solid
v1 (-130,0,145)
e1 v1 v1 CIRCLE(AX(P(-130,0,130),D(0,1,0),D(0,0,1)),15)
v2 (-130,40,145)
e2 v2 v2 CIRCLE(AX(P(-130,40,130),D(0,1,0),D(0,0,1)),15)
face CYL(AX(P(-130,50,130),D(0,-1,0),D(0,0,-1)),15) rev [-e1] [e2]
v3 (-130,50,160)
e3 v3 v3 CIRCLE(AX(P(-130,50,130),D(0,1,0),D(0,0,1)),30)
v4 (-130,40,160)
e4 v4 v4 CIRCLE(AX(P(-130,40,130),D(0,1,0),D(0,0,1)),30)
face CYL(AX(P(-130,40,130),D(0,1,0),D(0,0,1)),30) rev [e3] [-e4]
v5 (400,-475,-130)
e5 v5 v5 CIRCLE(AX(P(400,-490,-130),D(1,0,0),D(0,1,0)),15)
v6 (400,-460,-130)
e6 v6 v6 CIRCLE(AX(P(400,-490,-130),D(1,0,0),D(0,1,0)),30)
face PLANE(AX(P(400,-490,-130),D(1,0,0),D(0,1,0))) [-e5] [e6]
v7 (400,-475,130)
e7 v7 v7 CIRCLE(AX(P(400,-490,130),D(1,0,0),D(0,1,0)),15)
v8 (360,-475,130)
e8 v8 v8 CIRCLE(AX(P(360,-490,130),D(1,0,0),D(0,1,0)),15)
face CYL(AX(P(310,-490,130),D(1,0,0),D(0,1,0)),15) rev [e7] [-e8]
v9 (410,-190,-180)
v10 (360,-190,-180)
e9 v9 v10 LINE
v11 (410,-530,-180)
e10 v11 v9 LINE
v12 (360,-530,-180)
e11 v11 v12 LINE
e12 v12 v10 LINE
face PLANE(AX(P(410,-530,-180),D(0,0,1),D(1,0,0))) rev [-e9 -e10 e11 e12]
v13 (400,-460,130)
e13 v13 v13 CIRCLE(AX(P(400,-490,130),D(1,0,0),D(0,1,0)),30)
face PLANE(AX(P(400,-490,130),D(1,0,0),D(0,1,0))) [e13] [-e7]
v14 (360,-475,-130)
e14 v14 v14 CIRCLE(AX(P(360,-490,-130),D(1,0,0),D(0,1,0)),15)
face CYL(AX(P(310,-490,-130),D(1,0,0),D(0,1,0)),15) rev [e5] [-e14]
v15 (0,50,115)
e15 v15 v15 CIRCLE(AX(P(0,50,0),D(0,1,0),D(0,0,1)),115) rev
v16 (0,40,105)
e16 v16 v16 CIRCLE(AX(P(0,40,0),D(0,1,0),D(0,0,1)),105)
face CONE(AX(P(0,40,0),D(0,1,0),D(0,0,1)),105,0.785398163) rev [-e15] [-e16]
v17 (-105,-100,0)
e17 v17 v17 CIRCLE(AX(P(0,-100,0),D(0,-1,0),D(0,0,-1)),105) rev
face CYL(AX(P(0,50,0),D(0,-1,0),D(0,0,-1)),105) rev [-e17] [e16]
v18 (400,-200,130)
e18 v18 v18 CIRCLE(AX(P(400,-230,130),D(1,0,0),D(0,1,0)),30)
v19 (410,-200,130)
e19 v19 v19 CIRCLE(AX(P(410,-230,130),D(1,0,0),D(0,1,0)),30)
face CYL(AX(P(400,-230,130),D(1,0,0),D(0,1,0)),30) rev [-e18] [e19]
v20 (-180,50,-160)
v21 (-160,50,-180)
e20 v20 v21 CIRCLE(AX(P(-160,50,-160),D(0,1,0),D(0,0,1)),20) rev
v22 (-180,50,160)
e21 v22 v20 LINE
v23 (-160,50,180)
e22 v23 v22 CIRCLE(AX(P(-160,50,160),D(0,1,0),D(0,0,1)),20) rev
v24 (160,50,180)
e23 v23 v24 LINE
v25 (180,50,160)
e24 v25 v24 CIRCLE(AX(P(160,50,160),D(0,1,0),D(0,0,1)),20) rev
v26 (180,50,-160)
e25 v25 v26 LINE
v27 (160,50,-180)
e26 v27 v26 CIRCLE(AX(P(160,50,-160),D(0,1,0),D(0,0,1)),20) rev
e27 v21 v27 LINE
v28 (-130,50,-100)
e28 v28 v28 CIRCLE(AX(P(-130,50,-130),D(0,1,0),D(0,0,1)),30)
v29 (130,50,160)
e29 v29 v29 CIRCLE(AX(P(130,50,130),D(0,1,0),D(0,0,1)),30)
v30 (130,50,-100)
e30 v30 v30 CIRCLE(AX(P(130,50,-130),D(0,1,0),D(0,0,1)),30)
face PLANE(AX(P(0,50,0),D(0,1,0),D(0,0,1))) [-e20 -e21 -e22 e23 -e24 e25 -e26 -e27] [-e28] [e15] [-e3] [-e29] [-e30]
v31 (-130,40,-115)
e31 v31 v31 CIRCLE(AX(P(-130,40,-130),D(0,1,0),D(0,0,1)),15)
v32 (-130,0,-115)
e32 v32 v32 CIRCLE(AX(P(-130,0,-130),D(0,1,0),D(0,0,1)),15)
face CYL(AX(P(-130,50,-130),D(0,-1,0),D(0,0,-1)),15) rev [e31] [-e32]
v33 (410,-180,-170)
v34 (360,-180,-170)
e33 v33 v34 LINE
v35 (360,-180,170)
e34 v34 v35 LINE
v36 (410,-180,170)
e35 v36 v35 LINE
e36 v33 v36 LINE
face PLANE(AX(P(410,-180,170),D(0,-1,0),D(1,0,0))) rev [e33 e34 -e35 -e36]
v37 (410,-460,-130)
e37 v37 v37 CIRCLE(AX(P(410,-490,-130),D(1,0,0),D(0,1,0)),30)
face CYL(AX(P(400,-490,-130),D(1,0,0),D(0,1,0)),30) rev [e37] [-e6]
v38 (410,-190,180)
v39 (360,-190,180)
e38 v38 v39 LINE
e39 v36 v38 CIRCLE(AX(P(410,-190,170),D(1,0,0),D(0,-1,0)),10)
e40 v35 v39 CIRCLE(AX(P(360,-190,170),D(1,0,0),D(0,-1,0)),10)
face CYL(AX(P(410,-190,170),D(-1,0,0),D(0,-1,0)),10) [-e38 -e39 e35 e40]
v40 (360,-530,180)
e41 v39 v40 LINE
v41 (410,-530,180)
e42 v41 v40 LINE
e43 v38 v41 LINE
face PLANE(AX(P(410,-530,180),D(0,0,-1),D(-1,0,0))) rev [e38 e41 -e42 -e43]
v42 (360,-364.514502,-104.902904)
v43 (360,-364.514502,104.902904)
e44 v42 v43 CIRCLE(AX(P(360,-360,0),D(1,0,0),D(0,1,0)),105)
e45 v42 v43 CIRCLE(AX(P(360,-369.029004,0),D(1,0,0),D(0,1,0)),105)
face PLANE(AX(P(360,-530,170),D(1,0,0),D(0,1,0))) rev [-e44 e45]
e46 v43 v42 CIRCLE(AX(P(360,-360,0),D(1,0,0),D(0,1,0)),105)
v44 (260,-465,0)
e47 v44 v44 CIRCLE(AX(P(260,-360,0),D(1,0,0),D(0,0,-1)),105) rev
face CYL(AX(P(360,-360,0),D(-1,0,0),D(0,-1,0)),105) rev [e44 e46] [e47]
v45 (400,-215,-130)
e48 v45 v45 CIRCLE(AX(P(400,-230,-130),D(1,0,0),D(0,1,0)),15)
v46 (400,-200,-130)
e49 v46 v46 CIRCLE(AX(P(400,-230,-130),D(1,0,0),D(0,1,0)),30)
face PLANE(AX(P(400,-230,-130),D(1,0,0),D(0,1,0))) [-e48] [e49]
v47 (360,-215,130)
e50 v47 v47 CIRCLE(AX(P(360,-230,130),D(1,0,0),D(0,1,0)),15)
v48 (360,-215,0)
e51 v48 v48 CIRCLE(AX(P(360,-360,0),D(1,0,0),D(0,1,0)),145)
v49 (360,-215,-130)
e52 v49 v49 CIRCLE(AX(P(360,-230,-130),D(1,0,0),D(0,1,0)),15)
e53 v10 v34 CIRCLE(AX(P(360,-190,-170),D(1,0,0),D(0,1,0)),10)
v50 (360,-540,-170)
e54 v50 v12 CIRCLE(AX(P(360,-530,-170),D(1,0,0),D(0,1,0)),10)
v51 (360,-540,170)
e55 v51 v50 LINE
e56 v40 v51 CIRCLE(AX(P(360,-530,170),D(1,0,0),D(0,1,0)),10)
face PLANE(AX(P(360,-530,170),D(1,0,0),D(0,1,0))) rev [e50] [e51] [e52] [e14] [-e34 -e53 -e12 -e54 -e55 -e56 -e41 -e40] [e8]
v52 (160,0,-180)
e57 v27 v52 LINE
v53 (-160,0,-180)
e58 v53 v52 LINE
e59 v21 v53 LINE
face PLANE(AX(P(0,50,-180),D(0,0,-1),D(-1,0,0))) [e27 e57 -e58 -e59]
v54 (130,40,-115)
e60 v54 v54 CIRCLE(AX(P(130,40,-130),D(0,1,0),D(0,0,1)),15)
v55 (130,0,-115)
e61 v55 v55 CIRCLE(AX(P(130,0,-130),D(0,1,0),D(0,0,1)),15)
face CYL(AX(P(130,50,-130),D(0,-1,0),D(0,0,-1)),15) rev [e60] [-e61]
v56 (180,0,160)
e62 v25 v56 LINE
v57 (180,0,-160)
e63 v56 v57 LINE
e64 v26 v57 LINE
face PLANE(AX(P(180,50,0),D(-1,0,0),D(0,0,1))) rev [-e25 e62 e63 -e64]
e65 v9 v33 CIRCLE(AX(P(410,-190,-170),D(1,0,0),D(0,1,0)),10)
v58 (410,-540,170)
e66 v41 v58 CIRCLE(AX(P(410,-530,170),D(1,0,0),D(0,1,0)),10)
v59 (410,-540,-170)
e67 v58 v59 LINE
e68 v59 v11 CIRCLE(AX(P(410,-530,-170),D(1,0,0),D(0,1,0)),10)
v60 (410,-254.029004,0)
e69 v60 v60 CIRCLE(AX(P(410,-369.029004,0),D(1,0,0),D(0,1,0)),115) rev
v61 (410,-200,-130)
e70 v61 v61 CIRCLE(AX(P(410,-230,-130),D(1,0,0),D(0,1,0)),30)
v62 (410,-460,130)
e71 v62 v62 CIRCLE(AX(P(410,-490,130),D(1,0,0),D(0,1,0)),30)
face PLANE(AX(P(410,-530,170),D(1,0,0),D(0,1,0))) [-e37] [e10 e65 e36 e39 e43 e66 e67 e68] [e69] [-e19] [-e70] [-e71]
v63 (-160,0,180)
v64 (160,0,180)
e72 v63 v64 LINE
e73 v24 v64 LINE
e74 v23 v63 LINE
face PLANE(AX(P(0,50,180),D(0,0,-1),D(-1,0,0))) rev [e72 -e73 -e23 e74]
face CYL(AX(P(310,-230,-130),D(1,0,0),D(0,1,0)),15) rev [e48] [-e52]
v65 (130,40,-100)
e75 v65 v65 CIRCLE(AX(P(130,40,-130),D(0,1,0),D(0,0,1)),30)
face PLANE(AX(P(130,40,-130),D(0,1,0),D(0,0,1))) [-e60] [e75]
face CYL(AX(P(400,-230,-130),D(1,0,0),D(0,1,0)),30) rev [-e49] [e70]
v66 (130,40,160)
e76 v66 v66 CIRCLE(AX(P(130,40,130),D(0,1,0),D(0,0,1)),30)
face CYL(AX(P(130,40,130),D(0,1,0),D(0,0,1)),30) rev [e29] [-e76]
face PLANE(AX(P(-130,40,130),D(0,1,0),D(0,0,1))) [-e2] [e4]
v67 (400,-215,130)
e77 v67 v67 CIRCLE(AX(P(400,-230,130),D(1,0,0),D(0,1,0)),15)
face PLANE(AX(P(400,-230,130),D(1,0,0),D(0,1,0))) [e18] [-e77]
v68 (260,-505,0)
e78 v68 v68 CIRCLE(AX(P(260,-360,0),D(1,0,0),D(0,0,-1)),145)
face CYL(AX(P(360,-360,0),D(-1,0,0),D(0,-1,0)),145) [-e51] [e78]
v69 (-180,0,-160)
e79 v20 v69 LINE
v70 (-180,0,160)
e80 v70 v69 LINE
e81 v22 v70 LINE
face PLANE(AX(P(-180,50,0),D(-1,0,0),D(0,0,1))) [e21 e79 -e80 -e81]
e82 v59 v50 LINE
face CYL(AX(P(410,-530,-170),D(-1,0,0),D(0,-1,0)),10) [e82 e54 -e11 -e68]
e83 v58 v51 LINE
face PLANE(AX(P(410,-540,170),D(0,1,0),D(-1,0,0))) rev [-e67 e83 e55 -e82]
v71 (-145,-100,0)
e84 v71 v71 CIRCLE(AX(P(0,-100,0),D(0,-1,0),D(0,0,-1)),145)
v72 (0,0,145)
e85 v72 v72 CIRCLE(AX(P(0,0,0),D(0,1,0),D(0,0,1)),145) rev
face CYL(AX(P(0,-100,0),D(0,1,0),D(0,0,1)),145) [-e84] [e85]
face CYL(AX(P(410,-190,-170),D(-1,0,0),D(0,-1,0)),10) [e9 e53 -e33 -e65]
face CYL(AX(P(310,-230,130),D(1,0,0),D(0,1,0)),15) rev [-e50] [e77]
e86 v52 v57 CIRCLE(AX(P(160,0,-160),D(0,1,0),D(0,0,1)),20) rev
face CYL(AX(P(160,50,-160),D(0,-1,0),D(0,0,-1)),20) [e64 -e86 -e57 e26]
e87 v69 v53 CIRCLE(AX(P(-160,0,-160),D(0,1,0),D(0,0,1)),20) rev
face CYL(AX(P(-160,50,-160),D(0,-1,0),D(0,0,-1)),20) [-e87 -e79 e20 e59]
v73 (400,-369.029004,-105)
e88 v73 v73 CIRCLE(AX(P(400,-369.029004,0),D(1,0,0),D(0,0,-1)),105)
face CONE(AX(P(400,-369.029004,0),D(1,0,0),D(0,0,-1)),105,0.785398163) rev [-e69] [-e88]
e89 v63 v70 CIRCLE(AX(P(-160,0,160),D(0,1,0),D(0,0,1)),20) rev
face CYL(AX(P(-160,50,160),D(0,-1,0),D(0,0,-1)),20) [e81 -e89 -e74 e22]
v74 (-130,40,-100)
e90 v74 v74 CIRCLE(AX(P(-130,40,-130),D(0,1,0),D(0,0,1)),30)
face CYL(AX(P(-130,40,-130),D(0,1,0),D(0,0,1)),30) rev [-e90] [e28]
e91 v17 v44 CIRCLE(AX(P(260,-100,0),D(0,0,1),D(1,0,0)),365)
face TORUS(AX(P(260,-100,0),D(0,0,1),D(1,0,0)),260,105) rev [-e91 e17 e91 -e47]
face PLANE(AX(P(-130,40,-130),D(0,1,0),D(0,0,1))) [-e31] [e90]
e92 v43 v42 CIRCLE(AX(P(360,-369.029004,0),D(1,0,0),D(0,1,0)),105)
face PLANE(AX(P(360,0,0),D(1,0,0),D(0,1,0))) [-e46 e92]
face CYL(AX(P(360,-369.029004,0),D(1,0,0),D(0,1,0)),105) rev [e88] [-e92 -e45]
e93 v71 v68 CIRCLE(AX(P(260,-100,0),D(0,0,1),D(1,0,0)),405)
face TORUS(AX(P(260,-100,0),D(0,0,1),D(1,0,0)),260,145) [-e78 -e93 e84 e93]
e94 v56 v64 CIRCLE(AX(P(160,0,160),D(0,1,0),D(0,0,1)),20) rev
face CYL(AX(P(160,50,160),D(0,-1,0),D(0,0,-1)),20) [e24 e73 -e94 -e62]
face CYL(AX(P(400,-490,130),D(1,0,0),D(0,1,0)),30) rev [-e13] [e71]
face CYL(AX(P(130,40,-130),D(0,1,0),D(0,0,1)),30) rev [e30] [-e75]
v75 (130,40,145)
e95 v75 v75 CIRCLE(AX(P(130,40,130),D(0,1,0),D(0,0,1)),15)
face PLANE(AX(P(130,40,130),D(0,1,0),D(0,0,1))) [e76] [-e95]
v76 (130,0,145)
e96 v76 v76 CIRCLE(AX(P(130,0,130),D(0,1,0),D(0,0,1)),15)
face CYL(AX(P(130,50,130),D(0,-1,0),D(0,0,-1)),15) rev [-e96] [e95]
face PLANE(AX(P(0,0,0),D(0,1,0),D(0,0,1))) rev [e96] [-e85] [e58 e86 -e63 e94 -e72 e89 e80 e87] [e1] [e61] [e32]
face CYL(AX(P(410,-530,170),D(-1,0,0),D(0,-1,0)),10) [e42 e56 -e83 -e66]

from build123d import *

# Parameters (mm, degrees)
SKETCH2_R           = 30
SKETCH2_R_2         = 105
SKETCH2_R_3         = 28.090856429
SKETCH2_R_4         = 15
BOSS_EXTRUDE2_DEPTH = 50
SKETCH5_R           = 30
CUT_EXTRUDE1_DEPTH  = 10
CHAMFER2_SIZE       = 10
BOSS_EXTRUDE3_START = 100
SKETCH6_R           = 145
SKETCH6_R_2         = 105
BOSS_EXTRUDE3_DEPTH = 100
CUT_EXTRUDE2_START  = -10
SKETCH9_R           = 30
SKETCH9_R_2         = 15
CUT_EXTRUDE2_DEPTH  = 10
SWEEP3_OUTLINE_R    = 145
SWEEP3_OUTLINE_R_2  = 105
SWEEP3_ANGLE        = 90
SKETCH12_R          = 145
SKETCH12_R_2        = 105
BOSS_EXTRUDE5_DEPTH = 100
BOSS_EXTRUDE6_DEPTH = 50
SKETCH14_R          = 105
CUT_EXTRUDE5_DEPTH  = 50
SKETCH17_R          = 30
SKETCH17_R_2        = 15
CUT_EXTRUDE6_DEPTH  = 10
SKETCH18_R          = 15
CUT_EXTRUDE7_DEPTH  = 100
CHAMFER3_SIZE       = 10


# Read off the part's stored shape, not the designer's step: Sweep3
with BuildPart() as part:
    # Sketch2 → Boss-Extrude2 (new body)
    # profile 1 of 5: a face of its own
    with BuildSketch(Plane(origin=(0, 0, 0), x_dir=(1, 0, 0), z_dir=(0, 1, 0))):
        with BuildLine():
            Line((-180, -130), (-180, -160))
            ThreePointArc((-180, -160), (-174.142135624, -174.142135624), (-160, -180))
            Line((-160, -180), (160, -180))
            ThreePointArc((160, -180), (174.142135624, -174.142135624), (180, -160))
            Line((180, -160), (180, 160))
            ThreePointArc((180, 160), (174.142135624, 174.142135624), (160, 180))
            Line((160, 180), (-160, 180))
            ThreePointArc((-160, 180), (-174.142135624, 174.142135624), (-180, 160))
            Line((-180, 160), (-180, -130))
        make_face()
        with Locations((-130, -130)):
            Circle(SKETCH2_R, mode=Mode.SUBTRACT)
        with Locations((130, -130)):
            Circle(SKETCH2_R, mode=Mode.SUBTRACT)
        with Locations((-130, 130)):
            Circle(SKETCH2_R, mode=Mode.SUBTRACT)
        with Locations(Location((0, 0, 0), (0, 0, 270))):
            Circle(SKETCH2_R_2, mode=Mode.SUBTRACT)
        with Locations((130, 130)):
            Circle(SKETCH2_R_3, mode=Mode.SUBTRACT)
    # profile 2 of 5: a face of its own
    with BuildSketch(Plane(origin=(0, 0, 0), x_dir=(1, 0, 0), z_dir=(0, 1, 0))):
        with Locations((-130, 130)):
            Circle(SKETCH2_R)
        with Locations(Location((-130, 130, 0), (0, 0, 270))):
            Circle(SKETCH2_R_4, mode=Mode.SUBTRACT)
    # profile 3 of 5: a face of its own
    with BuildSketch(Plane(origin=(0, 0, 0), x_dir=(1, 0, 0), z_dir=(0, 1, 0))):
        with Locations((130, 130)):
            Circle(SKETCH2_R_3)
        with Locations(Location((130, 130, 0), (0, 0, 270))):
            Circle(SKETCH2_R_4, mode=Mode.SUBTRACT)
    # profile 4 of 5: a face of its own
    with BuildSketch(Plane(origin=(0, 0, 0), x_dir=(1, 0, 0), z_dir=(0, 1, 0))):
        with Locations((-130, -130)):
            Circle(SKETCH2_R)
        with Locations(Location((-130, -130, 0), (0, 0, 270))):
            Circle(SKETCH2_R_4, mode=Mode.SUBTRACT)
    # profile 5 of 5: a face of its own
    with BuildSketch(Plane(origin=(0, 0, 0), x_dir=(1, 0, 0), z_dir=(0, 1, 0))):
        with Locations((130, -130)):
            Circle(SKETCH2_R)
        with Locations(Location((130, -130, 0), (0, 0, 270))):
            Circle(SKETCH2_R_4, mode=Mode.SUBTRACT)
    extrude(amount=BOSS_EXTRUDE2_DEPTH)

    # Sketch5 → Cut-Extrude1 (cut)
    with BuildSketch(Plane(origin=(0, 50, 0), x_dir=(1, 0, 0), z_dir=(0, 1, 0))):
        with Locations(Location((-130, 130, 0), (0, 0, 270))):
            Circle(SKETCH5_R)
        with Locations(Location((130, 130, 0), (0, 0, 270))):
            Circle(SKETCH5_R)
        with Locations(Location((-130, -130, 0), (0, 0, 270))):
            Circle(SKETCH5_R)
    extrude(amount=-CUT_EXTRUDE1_DEPTH, mode=Mode.SUBTRACT)

    # Chamfer2
    chamfer2_edges = [part.edges().sort_by_distance(p)[0] for p in [
        (0, 50, -105),
    ]]
    chamfer(chamfer2_edges, length=CHAMFER2_SIZE)

    # Sketch6 → Boss-Extrude3 (add)
    with BuildSketch(Plane.XZ.offset(BOSS_EXTRUDE3_START)):
        with Locations(Location((0, 0, 0), (0, 0, 90))):
            Circle(SKETCH6_R)
        with Locations(Location((0, 0, 0), (0, 0, 270))):
            Circle(SKETCH6_R_2, mode=Mode.SUBTRACT)
    extrude(amount=-BOSS_EXTRUDE3_DEPTH)

    # Sketch9 → Cut-Extrude2 (cut)
    with BuildSketch(Plane(origin=(0, 50, 0), x_dir=(1, 0, 0), z_dir=(0, 1, 0)).offset(CUT_EXTRUDE2_START)):
        with Locations(Location((130, -130, 0), (0, 0, 270))):
            Circle(SKETCH9_R)
        with Locations(Location((130, -130, 0), (0, 0, 270))):
            Circle(SKETCH9_R_2, mode=Mode.SUBTRACT)
    extrude(amount=CUT_EXTRUDE2_DEPTH, mode=Mode.SUBTRACT)

    # Sweep3 outline → Sweep3 (revolve)
    with BuildSketch(Plane(origin=(260, -100, 0), x_dir=(-1, 0, 0), z_dir=(0, 1, 0))):
        with Locations((260, 0)):
            Circle(SWEEP3_OUTLINE_R)
        with Locations((260, 0)):
            Circle(SWEEP3_OUTLINE_R_2, mode=Mode.SUBTRACT)
    revolve(axis=Axis((260, -100, 0), (0, 0, 1)), revolution_arc=SWEEP3_ANGLE)

    # Sketch12 → Boss-Extrude5 (add)
    with BuildSketch(Plane(origin=(260, 0, 0), x_dir=(0, 0, -1), z_dir=(1, 0, 0))):
        with Locations(Location((0, -360, 0), (0, 0, 270))):
            Circle(SKETCH12_R)
        with Locations(Location((0, -360, 0), (0, 0, 270))):
            Circle(SKETCH12_R_2, mode=Mode.SUBTRACT)
    extrude(amount=BOSS_EXTRUDE5_DEPTH)

    # Sketch13 → Boss-Extrude6 (add)
    with BuildSketch(Plane(origin=(360, 0, 0), x_dir=(0, 0, -1), z_dir=(1, 0, 0))):
        with BuildLine():
            Line((-170, -540), (170, -540))
            ThreePointArc((170, -540), (177.071067812, -537.071067812), (180, -530))
            Line((180, -530), (180, -190))
            ThreePointArc((180, -190), (177.071067812, -182.928932188), (170, -180))
            Line((170, -180), (-170, -180))
            ThreePointArc((-170, -180), (-177.071067812, -182.928932188), (-180, -190))
            Line((-180, -190), (-180, -530))
            ThreePointArc((-180, -530), (-177.071067812, -537.071067812), (-170, -540))
        make_face()
    extrude(amount=BOSS_EXTRUDE6_DEPTH)

    # Sketch14 → Cut-Extrude5 (cut)
    with BuildSketch(Plane(origin=(410, 0, 0), x_dir=(0, 0, -1), z_dir=(1, 0, 0))):
        with Locations(Location((0, -369.029004143, 0), (0, 0, 90))):
            Circle(SKETCH14_R)
    extrude(amount=-CUT_EXTRUDE5_DEPTH, mode=Mode.SUBTRACT)

    # Sketch17 → Cut-Extrude6 (cut)
    # profile 1 of 4: a face of its own
    with BuildSketch(Plane(origin=(410, 0, 0), x_dir=(0, 0, -1), z_dir=(1, 0, 0))):
        with Locations(Location((-130, -230, 0), (0, 0, 90))):
            Circle(SKETCH17_R)
        with Locations(Location((-130, -230, 0), (0, 0, 90))):
            Circle(SKETCH17_R_2, mode=Mode.SUBTRACT)
    # profile 2 of 4: a face of its own
    with BuildSketch(Plane(origin=(410, 0, 0), x_dir=(0, 0, -1), z_dir=(1, 0, 0))):
        with Locations(Location((-130, -490, 0), (0, 0, 90))):
            Circle(SKETCH17_R)
        with Locations(Location((-130, -490, 0), (0, 0, 90))):
            Circle(SKETCH17_R_2, mode=Mode.SUBTRACT)
    # profile 3 of 4: a face of its own
    with BuildSketch(Plane(origin=(410, 0, 0), x_dir=(0, 0, -1), z_dir=(1, 0, 0))):
        with Locations(Location((130, -490, 0), (0, 0, 90))):
            Circle(SKETCH17_R)
        with Locations(Location((130, -490, 0), (0, 0, 90))):
            Circle(SKETCH17_R_2, mode=Mode.SUBTRACT)
    # profile 4 of 4: a face of its own
    with BuildSketch(Plane(origin=(410, 0, 0), x_dir=(0, 0, -1), z_dir=(1, 0, 0))):
        with Locations(Location((130, -230, 0), (0, 0, 90))):
            Circle(SKETCH17_R)
        with Locations(Location((130, -230, 0), (0, 0, 90))):
            Circle(SKETCH17_R_2, mode=Mode.SUBTRACT)
    extrude(amount=-CUT_EXTRUDE6_DEPTH, mode=Mode.SUBTRACT)

    # Sketch18 → Cut-Extrude7 (cut)
    with BuildSketch(Plane(origin=(410, 0, 0), x_dir=(0, 0, -1), z_dir=(1, 0, 0))):
        with Locations(Location((-130, -230, 0), (0, 0, 90))):
            Circle(SKETCH18_R)
        with Locations(Location((130, -230, 0), (0, 0, 90))):
            Circle(SKETCH18_R)
        with Locations(Location((-130, -490, 0), (0, 0, 90))):
            Circle(SKETCH18_R)
        with Locations(Location((130, -490, 0), (0, 0, 90))):
            Circle(SKETCH18_R)
    extrude(amount=-CUT_EXTRUDE7_DEPTH, mode=Mode.SUBTRACT)

    # Chamfer3
    chamfer3_edges = [part.edges().sort_by_distance(p)[0] for p in [
        (410, -474.029004143, 0),
    ]]
    chamfer(chamfer3_edges, length=CHAMFER3_SIZE)


solid = part.part
